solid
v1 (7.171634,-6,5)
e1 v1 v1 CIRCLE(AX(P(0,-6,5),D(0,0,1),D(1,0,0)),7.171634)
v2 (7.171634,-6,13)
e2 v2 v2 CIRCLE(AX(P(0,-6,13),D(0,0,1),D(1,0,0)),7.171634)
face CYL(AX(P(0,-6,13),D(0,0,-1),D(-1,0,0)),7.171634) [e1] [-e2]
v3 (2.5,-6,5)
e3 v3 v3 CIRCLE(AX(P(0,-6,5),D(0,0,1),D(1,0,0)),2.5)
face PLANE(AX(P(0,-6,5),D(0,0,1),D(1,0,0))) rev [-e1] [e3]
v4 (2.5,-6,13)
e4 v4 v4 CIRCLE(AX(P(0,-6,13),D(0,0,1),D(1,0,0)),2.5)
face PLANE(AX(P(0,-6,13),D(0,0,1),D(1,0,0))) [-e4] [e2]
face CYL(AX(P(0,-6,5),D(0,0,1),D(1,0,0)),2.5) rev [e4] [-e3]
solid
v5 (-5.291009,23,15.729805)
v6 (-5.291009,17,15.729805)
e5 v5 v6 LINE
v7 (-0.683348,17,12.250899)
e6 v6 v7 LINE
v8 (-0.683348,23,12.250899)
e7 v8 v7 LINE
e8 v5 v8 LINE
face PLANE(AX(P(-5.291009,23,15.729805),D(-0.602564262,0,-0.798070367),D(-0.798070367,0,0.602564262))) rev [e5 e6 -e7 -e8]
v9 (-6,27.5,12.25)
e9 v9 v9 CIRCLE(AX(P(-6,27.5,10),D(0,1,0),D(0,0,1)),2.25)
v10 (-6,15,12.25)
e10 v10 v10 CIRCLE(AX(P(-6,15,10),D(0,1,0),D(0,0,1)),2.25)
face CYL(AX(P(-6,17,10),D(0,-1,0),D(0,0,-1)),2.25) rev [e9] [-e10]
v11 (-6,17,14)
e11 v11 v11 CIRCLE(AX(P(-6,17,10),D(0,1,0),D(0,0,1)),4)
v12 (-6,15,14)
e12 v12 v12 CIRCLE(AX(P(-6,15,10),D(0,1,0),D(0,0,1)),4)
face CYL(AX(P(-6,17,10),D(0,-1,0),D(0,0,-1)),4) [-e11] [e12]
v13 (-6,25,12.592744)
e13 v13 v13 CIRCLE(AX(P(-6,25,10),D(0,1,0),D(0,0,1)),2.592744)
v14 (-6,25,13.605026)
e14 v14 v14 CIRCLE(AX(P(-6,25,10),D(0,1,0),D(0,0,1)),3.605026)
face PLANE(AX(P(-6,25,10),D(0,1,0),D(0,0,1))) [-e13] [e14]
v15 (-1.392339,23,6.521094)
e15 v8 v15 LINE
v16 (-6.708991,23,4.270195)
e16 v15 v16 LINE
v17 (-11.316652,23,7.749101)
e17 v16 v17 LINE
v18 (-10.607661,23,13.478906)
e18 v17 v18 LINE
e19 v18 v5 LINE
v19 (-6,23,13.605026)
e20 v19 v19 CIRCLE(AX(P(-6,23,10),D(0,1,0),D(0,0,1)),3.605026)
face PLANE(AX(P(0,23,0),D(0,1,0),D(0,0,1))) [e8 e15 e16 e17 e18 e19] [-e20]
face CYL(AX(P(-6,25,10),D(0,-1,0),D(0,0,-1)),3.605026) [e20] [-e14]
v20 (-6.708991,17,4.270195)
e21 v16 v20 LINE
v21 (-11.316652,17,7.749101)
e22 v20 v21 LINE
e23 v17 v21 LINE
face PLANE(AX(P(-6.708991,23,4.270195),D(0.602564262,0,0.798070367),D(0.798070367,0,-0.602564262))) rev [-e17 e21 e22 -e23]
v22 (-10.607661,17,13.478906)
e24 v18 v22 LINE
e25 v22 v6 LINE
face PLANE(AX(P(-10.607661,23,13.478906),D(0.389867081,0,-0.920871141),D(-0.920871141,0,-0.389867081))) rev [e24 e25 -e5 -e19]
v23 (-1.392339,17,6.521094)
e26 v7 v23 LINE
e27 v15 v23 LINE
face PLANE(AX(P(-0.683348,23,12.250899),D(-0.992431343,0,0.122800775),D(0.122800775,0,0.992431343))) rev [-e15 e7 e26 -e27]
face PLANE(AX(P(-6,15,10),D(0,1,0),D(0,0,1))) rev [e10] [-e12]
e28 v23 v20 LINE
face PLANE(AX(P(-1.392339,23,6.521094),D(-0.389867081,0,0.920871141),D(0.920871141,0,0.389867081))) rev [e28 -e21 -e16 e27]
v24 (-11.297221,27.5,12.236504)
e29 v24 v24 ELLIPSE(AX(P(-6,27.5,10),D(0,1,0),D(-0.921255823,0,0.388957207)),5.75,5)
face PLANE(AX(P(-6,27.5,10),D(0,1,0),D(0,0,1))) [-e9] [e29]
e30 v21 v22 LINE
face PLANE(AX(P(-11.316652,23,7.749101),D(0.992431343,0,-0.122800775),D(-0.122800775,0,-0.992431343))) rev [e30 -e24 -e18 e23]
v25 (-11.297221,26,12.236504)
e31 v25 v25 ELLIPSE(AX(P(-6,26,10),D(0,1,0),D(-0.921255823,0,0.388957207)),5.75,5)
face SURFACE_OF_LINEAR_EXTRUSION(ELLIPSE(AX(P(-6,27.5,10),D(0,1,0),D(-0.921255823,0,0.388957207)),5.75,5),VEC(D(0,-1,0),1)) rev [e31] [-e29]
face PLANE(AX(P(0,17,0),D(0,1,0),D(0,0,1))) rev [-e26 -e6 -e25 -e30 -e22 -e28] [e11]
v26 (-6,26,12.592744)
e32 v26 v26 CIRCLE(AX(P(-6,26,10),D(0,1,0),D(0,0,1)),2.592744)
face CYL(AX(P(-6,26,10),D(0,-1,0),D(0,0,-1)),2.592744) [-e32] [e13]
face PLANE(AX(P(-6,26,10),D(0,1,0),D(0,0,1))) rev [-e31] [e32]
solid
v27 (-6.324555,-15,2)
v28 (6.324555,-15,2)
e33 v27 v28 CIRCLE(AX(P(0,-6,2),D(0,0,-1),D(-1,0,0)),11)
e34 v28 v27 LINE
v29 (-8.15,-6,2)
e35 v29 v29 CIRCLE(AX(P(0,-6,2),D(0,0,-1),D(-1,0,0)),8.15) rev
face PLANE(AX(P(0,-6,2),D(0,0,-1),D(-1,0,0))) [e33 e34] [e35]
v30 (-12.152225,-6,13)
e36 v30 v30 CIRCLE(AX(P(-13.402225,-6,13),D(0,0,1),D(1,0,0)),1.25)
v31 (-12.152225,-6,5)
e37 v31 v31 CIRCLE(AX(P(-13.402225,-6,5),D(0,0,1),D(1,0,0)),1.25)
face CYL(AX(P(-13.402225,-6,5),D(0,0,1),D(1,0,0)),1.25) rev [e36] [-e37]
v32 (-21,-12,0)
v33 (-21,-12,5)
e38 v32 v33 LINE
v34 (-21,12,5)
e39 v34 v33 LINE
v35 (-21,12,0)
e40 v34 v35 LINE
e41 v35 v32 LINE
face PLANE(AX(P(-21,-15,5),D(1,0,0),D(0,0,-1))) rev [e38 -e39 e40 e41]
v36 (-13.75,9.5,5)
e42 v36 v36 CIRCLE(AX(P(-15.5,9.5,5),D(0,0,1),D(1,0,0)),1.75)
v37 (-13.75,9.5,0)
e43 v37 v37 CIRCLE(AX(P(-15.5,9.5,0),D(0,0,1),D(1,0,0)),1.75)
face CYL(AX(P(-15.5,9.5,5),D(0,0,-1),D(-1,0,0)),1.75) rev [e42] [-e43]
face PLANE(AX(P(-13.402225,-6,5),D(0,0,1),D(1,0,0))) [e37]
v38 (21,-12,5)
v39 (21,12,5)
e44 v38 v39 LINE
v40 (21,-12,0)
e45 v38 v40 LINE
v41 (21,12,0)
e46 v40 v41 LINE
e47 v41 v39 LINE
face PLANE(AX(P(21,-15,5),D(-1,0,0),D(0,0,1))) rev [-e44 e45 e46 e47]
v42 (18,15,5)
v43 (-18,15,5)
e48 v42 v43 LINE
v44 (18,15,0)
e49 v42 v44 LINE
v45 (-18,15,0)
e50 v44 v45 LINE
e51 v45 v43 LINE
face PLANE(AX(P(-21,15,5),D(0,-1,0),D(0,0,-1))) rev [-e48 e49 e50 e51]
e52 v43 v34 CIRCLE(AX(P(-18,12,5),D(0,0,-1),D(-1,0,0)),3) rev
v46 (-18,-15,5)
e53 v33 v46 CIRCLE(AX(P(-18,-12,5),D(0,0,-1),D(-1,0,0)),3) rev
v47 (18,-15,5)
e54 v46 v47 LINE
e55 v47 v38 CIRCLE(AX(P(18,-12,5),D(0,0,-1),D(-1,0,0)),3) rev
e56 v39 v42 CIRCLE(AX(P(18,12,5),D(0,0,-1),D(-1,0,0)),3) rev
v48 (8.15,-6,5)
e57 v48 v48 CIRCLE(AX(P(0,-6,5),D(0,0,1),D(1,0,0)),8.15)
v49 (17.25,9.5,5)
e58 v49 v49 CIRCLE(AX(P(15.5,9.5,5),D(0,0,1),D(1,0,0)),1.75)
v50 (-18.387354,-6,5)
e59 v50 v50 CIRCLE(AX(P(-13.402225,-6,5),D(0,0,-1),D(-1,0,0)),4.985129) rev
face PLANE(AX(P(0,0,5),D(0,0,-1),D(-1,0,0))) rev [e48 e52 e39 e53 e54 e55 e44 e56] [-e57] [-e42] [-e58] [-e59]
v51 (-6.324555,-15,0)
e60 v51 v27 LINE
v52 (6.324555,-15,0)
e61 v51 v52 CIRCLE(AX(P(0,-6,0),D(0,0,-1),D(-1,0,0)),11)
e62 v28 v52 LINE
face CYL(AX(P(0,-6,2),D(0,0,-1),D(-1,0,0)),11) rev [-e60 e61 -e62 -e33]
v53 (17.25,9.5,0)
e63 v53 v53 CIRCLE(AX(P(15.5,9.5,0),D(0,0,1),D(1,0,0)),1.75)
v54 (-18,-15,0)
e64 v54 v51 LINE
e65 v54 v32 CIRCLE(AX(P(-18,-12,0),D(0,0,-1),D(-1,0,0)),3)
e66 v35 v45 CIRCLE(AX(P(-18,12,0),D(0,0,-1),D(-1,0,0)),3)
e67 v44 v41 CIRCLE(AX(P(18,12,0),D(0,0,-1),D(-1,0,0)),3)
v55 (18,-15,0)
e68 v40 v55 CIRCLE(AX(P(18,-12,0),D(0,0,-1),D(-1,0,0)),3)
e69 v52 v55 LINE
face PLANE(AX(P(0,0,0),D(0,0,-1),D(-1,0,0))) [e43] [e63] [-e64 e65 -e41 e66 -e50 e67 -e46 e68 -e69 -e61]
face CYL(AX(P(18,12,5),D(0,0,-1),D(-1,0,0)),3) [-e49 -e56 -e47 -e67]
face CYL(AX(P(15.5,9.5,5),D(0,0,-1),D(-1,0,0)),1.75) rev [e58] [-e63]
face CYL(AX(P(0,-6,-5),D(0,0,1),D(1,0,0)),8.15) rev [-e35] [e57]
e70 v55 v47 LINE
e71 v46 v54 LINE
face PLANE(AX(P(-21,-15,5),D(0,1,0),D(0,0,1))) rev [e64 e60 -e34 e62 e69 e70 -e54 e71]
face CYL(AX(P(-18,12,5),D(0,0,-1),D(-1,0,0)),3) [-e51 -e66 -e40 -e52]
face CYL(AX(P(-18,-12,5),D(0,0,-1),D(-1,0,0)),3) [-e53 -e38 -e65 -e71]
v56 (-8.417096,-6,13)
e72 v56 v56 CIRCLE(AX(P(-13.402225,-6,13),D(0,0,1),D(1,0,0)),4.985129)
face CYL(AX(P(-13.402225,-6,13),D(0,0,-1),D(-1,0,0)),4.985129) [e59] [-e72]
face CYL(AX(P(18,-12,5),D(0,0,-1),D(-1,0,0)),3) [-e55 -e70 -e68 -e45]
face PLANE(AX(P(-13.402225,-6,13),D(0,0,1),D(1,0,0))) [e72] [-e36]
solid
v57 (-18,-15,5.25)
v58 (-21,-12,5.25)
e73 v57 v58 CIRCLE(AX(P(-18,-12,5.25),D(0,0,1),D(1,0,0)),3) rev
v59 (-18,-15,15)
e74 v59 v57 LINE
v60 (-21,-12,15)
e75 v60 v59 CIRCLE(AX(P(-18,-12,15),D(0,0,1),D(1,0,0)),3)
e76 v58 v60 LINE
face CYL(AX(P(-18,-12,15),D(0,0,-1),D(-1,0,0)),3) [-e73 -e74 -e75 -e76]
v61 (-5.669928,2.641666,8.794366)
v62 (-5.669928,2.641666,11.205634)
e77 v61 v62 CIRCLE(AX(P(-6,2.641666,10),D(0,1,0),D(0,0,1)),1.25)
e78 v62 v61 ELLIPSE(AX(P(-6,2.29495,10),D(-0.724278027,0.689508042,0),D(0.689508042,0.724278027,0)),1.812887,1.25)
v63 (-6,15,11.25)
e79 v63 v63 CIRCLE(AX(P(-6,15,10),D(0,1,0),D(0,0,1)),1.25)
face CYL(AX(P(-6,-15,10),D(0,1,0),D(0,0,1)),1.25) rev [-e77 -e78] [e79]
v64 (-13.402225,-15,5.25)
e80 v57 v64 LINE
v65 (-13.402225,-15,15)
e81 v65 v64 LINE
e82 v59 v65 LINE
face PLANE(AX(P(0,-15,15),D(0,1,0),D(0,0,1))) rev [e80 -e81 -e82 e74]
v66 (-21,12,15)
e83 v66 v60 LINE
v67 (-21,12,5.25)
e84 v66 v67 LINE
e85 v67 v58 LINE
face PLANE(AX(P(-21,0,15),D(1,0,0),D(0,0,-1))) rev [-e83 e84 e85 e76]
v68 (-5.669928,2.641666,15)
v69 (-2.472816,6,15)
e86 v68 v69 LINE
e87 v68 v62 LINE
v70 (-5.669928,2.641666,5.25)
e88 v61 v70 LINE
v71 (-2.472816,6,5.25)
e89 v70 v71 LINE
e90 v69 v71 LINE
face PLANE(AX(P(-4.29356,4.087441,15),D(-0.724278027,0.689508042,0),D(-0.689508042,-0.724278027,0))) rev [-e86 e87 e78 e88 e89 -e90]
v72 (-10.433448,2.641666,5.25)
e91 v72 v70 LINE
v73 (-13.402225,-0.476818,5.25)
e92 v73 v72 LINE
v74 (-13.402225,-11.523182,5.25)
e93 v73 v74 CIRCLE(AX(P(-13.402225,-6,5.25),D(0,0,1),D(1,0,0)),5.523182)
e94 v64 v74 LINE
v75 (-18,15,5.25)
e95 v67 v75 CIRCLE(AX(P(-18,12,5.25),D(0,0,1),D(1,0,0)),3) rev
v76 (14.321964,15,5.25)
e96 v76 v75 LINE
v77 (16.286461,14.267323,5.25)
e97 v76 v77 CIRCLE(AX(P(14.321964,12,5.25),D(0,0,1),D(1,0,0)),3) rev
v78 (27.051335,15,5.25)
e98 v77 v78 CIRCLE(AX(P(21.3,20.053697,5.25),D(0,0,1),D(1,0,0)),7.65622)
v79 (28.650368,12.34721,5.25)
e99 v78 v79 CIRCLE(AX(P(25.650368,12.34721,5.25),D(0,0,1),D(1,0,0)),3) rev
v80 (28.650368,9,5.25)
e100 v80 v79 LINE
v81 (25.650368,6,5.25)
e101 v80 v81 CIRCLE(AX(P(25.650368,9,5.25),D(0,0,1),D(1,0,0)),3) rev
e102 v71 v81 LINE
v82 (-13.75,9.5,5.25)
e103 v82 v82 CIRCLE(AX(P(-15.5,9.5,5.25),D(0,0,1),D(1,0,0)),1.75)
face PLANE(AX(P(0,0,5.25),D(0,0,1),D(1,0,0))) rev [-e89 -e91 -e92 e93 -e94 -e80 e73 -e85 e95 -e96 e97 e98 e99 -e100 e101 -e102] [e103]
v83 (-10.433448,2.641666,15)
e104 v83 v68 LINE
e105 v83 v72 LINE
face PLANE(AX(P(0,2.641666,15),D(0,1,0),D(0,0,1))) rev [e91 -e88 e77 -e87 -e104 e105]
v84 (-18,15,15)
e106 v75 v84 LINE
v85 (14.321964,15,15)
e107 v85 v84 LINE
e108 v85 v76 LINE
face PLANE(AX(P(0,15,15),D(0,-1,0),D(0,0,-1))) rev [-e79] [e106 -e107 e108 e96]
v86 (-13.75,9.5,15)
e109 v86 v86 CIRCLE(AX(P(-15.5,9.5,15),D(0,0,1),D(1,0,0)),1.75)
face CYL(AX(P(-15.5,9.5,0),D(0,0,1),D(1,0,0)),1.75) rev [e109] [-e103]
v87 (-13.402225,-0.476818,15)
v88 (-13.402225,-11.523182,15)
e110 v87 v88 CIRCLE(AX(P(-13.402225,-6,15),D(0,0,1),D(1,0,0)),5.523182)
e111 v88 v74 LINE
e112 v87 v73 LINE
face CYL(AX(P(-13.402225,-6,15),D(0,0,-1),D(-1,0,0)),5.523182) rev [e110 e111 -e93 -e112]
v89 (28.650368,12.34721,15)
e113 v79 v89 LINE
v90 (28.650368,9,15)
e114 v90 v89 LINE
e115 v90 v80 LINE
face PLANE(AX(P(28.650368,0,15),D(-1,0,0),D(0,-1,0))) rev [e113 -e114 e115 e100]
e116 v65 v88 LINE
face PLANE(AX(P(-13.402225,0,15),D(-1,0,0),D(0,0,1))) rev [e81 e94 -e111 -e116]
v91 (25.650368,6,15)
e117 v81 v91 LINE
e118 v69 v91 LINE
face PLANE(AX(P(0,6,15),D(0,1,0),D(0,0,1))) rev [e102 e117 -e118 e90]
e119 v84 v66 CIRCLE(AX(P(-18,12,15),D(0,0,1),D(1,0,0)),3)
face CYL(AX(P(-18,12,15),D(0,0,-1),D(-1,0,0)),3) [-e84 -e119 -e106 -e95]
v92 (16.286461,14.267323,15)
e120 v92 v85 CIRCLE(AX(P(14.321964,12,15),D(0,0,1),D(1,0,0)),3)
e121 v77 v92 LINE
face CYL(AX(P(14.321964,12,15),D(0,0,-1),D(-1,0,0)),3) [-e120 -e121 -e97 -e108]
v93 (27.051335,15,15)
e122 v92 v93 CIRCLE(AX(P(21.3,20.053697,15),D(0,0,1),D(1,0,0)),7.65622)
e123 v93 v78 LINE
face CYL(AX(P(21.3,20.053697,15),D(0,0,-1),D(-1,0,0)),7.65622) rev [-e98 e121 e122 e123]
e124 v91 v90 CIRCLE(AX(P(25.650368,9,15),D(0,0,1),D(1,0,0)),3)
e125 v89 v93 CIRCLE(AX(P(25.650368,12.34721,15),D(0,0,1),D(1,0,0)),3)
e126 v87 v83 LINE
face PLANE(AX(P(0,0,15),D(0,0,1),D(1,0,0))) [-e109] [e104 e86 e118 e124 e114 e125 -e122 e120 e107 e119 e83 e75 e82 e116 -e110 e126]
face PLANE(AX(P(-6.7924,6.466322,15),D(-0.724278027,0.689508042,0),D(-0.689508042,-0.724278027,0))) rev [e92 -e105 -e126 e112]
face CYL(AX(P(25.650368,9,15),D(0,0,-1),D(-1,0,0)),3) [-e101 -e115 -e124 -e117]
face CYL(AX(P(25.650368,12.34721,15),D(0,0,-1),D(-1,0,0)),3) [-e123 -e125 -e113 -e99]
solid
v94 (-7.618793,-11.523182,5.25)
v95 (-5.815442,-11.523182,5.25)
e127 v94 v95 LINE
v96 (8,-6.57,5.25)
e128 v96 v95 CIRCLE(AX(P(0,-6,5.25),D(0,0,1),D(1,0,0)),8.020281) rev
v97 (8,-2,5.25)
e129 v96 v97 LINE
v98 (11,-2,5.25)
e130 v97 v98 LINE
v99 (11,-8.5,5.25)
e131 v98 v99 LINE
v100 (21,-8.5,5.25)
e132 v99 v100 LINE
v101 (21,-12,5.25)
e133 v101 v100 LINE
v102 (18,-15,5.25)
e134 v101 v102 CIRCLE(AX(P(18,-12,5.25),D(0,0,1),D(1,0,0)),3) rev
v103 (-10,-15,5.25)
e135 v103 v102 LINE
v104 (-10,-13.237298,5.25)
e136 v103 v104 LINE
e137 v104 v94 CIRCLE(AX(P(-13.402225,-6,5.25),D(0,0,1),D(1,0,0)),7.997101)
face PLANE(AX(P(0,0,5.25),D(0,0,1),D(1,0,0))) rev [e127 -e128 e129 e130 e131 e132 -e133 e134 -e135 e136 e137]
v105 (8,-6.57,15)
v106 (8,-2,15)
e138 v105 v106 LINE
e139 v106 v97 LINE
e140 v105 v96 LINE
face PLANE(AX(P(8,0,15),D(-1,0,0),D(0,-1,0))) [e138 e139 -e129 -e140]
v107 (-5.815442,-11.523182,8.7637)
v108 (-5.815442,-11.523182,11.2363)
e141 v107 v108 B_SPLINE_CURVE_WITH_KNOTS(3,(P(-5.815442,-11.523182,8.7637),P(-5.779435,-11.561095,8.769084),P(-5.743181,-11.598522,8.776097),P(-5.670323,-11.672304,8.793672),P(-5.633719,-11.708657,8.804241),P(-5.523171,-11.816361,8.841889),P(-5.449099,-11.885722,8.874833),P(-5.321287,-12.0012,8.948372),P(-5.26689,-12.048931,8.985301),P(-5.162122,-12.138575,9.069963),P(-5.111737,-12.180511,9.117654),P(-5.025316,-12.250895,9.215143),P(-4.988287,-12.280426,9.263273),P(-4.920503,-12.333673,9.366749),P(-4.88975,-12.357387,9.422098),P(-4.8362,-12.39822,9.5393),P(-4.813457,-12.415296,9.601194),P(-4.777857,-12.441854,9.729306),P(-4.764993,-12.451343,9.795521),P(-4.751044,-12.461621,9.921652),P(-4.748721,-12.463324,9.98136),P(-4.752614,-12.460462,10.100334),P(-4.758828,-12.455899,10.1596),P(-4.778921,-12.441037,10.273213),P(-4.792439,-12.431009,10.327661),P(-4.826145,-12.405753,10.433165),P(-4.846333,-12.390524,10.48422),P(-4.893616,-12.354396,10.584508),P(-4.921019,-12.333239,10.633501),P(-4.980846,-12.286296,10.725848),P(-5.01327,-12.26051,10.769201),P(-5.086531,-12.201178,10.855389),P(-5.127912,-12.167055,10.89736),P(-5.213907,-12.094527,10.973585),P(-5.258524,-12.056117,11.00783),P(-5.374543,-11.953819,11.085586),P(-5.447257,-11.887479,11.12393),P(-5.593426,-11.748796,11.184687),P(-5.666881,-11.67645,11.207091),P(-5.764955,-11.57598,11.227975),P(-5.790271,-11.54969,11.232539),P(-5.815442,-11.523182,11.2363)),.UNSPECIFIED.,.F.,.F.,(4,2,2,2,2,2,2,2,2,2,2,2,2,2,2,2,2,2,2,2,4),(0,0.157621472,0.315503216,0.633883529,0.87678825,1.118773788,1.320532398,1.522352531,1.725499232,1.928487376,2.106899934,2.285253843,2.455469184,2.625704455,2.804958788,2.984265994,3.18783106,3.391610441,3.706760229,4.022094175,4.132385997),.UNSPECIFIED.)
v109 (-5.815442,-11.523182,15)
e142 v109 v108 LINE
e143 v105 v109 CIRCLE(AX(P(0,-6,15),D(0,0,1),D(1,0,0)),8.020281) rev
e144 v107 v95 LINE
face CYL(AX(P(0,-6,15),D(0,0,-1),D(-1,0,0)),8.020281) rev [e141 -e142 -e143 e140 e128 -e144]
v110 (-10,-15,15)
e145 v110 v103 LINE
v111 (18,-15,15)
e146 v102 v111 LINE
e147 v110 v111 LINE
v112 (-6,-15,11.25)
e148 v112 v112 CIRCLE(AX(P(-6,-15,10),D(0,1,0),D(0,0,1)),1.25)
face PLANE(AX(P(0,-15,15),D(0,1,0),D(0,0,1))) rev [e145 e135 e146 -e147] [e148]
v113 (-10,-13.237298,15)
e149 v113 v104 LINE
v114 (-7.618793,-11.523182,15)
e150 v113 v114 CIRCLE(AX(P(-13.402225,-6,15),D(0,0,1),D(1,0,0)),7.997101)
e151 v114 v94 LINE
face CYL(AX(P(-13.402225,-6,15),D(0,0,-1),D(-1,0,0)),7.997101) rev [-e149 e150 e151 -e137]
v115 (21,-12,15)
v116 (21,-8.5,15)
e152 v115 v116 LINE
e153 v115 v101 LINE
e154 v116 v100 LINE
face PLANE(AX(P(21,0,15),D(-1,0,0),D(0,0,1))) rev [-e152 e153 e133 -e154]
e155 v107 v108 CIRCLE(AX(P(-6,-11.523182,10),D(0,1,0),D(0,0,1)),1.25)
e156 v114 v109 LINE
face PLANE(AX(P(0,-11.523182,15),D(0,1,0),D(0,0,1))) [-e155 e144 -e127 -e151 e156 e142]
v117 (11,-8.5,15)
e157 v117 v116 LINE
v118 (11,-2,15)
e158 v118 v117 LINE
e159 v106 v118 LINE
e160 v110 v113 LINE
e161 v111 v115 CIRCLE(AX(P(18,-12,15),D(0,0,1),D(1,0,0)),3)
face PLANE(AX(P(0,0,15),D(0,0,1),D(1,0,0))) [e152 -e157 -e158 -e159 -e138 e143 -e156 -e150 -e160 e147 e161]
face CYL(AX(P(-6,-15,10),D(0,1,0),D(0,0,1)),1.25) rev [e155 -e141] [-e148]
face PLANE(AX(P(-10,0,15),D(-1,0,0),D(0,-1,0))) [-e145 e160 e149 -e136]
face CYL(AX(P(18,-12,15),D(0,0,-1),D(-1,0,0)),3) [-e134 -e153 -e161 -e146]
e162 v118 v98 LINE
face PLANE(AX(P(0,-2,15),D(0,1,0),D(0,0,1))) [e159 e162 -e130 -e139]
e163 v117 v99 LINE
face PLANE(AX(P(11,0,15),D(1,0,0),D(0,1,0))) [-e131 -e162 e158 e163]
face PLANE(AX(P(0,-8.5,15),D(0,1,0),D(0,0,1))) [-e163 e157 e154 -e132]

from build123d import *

# Parameters (mm, degrees)
SKETCH1_W           = 42
SKETCH1_H           = 30
BOSS_EXTRUDE1_DEPTH = 5
BOSS_EXTRUDE2_START = 0.25
BOSS_EXTRUDE2_DEPTH = 9.75
FILLET1_R           = 3
SKETCH6_R           = 4
SKETCH6_R_2         = 2.25
BOSS_EXTRUDE3_DEPTH = 2
FILLET2_R           = 3
FILLET3_R           = 3
FILLET4_R           = 3
BOSS_EXTRUDE5_DEPTH = 6
SKETCH14_R          = 3.605025609
BOSS_EXTRUDE6_DEPTH = 2
SKETCH15_R          = 2.592744477
BOSS_EXTRUDE7_DEPTH = 1
SKETCH16_RX         = 5.75
SKETCH16_RY         = 5
BOSS_EXTRUDE8_DEPTH = 1.5
SKETCH8_R           = 1.75
CUT_EXTRUDE10_DEPTH = 5
SKETCH5_R           = 8.15
CUT_EXTRUDE2_DEPTH  = 10
SKETCH10_R          = 11
CUT_EXTRUDE11_DEPTH = 2
SKETCH19_R          = 2.25
CUT_EXTRUDE14_DEPTH = 11
SKETCH17_R          = 1.75
CUT_EXTRUDE12_DEPTH = 43.451073105
SKETCH9_R           = 4.985129207
SKETCH9_R_2         = 7.17163429
BOSS_EXTRUDE9_DEPTH = 8
SKETCH21_R          = 2.5
SKETCH21_R_2        = 1.25
CUT_EXTRUDE17_DEPTH = 8
SKETCH20_R          = 1.25
CUT_EXTRUDE16_DEPTH = 30


with BuildPart() as part:
    # Sketch1 → Boss-Extrude1 (new body)
    with BuildSketch(Plane.XY):
        Rectangle(SKETCH1_W, SKETCH1_H)
    extrude(amount=BOSS_EXTRUDE1_DEPTH)

    # Fillet1
    fillet1_edges = [part.edges().sort_by_distance(p)[0] for p in [
        (21, -15, 2.5),
        (-21, -15, 2.5),
        (-21, 15, 2.5),
        (21, 15, 2.5),
    ]]
    fillet(fillet1_edges, radius=FILLET1_R)

    # Sketch8 → Cut-Extrude10 (cut)
    with BuildSketch(Plane.XY):
        with Locations((15.5, 9.5)):
            Circle(SKETCH8_R)
        with Locations((-15.5, 9.5)):
            Circle(SKETCH8_R)
    extrude(amount=CUT_EXTRUDE10_DEPTH, mode=Mode.SUBTRACT)

    # Sketch5 → Cut-Extrude2 (cut)
    with BuildSketch(Plane.XY.offset(5)):
        with Locations((0, -6)):
            Circle(SKETCH5_R)
    extrude(amount=-CUT_EXTRUDE2_DEPTH, mode=Mode.SUBTRACT)

    # Sketch10 → Cut-Extrude11 (cut)
    with BuildSketch(Plane(origin=(0, 0, 0), x_dir=(-1, 0, 0), z_dir=(0, 0, -1))):
        with Locations((0, -6)):
            Circle(SKETCH10_R)
    extrude(amount=-CUT_EXTRUDE11_DEPTH, mode=Mode.SUBTRACT)

    # Sketch9 → Boss-Extrude9 (add)
    with BuildSketch(Plane.XY.offset(5)):
        with Locations(Location((-13.402224813, -6, 0), (0, 0, 180))):
            Circle(SKETCH9_R)
        with Locations((0, -6)):
            Circle(SKETCH9_R_2)
    extrude(amount=BOSS_EXTRUDE9_DEPTH)


with BuildPart() as body_2:
    # Sketch2 → Boss-Extrude2 (new body)
    with BuildSketch(Plane.XY.offset(5).offset(BOSS_EXTRUDE2_START)):
        with BuildLine():
            Line((-2.472815877, 6), (21, 6))
            Line((21, 6), (21, 12.403357084))
            ThreePointArc((21, 12.403357084), (18.007538755, 13.141577193), (15.548665456, 15))
            Line((15.548665456, 15), (-21, 15))
            Line((-21, 15), (-21, -15))
            Line((-21, -15), (-13.402224813, -15))
            Line((-13.402224813, -15), (-13.402224813, -11.523181725))
            ThreePointArc((-13.402224813, -11.523181725), (-18.925406538, -6), (-13.402224813, -0.476818275))
            Line((-13.402224813, -0.476818275), (-10.433447695, 2.64166607))
            Line((-10.433447695, 2.64166607), (-5.669928262, 2.64166607))
            Line((-5.669928262, 2.64166607), (-2.472815877, 6))
        make_face()
        with BuildLine():
            Line((8, -2), (8, -6.57))
            ThreePointArc((8, -6.57), (2.706764841, -13.549723445), (-5.815441826, -11.523181725))
            Line((-5.815441826, -11.523181725), (-7.618792835, -11.523181725))
            ThreePointArc((-7.618792835, -11.523181725), (-8.730113763, -12.490377504), (-10, -13.2372984))
            Line((-10, -13.2372984), (-10, -15))
            Line((-10, -15), (21, -15))
            Line((21, -15), (21, -8.5))
            Line((21, -8.5), (11, -8.5))
            Line((11, -8.5), (11, -2))
            Line((11, -2), (8, -2))
        make_face()
        with BuildLine():
            Line((21, 12.403357084), (21, 6))
            Line((21, 6), (28.65036837, 6))
            Line((28.65036837, 6), (28.65036837, 15))
            Line((28.65036837, 15), (27.051334544, 15))
            ThreePointArc((27.051334544, 15), (24.31908938, 13.017874339), (21, 12.403357084))
        make_face()
    extrude(amount=BOSS_EXTRUDE2_DEPTH)

    # Fillet2
    fillet2_edges = [body_2.edges().sort_by_distance(p)[0] for p in [
        (-21, 15, 10.125),
    ]]
    fillet(fillet2_edges, radius=FILLET2_R)

    # Fillet3
    fillet3_edges = [body_2.edges().sort_by_distance(p)[0] for p in [
        (21, -15, 10.125),
    ]]
    fillet(fillet3_edges, radius=FILLET3_R)

    # Fillet4
    # the kernel refuses this fillet: 3 mm, written as the material it takes off along each edge
    with BuildSketch(Plane(origin=(28.65036837, 15, -1.381974526), x_dir=(-1, 0, 0), z_dir=(0, 0, 1))) as fillet4_piece_1:
        with BuildLine():
            CenterArc((3, 2.65278981), FILLET4_R, 180, 62.160994983)
            Line((0, 2.65278981), (-0.06, 2.65278981))
            Line((-0.06, 2.65278981), (-0.06, 0))
            Line((-0.06, 0), (0, -0.06))
            ThreePointArc((0, -0.06), (0.799516913, -0.06), (1.571014502, -0.053055796))
            Line((1.571014502, -0.053055796), (1.599033825, 0))
        make_face()
    extrude(amount=23.013949052, mode=Mode.SUBTRACT)
    with BuildSketch(Plane(origin=(28.65036837, 6, -2.25), x_dir=(0, 1, 0), z_dir=(0, 0, 1))) as fillet4_piece_2:
        with BuildLine():
            CenterArc((FILLET4_R, FILLET4_R), FILLET4_R, 180, 90)
            Line((0, FILLET4_R), (-FILLET4_R * 0.02, FILLET4_R))
            Line((-FILLET4_R * 0.02, FILLET4_R), (-FILLET4_R * 0.02, -FILLET4_R * 0.02))
            Line((-FILLET4_R * 0.02, -FILLET4_R * 0.02), (FILLET4_R, -FILLET4_R * 0.02))
            Line((FILLET4_R, -FILLET4_R * 0.02), (FILLET4_R, 0))
        make_face()
    extrude(amount=24.75, mode=Mode.SUBTRACT)
    with BuildSketch(Plane(origin=(-21, -15, -2.25), x_dir=(0, 1, 0), z_dir=(0, 0, 1))) as fillet4_piece_3:
        with BuildLine():
            CenterArc((FILLET4_R, -FILLET4_R), FILLET4_R, 90, 90)
            Line((0, -FILLET4_R), (-FILLET4_R * 0.02, -FILLET4_R))
            Line((-FILLET4_R * 0.02, -FILLET4_R), (-FILLET4_R * 0.02, FILLET4_R * 0.02))
            Line((-FILLET4_R * 0.02, FILLET4_R * 0.02), (FILLET4_R, FILLET4_R * 0.02))
            Line((FILLET4_R, FILLET4_R * 0.02), (FILLET4_R, 0))
        make_face()
    extrude(amount=24.75, mode=Mode.SUBTRACT)
    with BuildSketch(Plane(origin=(15.548665456, 15, 2.183246521), x_dir=(-1, 0, 0), z_dir=(0, 0, 1))) as fillet4_piece_4:
        with BuildLine():
            CenterArc((1.226701392, 3), FILLET4_R, 229.093072907, 40.906927093)
            Line((-0.737795184, 0.732677085), (-0.777085116, 0.687330626))
            ThreePointArc((-0.777085116, 0.687330626), (-0.398723642, 0.336304143), (-0.045071859, -0.03960464))
            Line((-0.045071859, -0.03960464), (0, -0.06))
            Line((0, -0.06), (1.226701392, -0.06))
            Line((1.226701392, -0.06), (1.226701392, 0))
        make_face()
    extrude(amount=15.883506959, mode=Mode.SUBTRACT)

    # Sketch17 → Cut-Extrude12 (cut, through all)
    with BuildSketch(Plane.XY.offset(15)):
        with Locations((-15.5, 9.5)):
            Circle(SKETCH17_R)
    extrude(amount=-CUT_EXTRUDE12_DEPTH, mode=Mode.SUBTRACT)

    # Sketch20 → Cut-Extrude16 (cut)
    with BuildSketch(Plane(origin=(0, 15, 0), x_dir=(1, 0, 0), z_dir=(0, 1, 0))):
        with Locations(Location((-6, -10, 0), (0, 0, 270))):
            Circle(SKETCH20_R)
    extrude(amount=-CUT_EXTRUDE16_DEPTH, mode=Mode.SUBTRACT)


with BuildPart() as body_3:
    # Sketch6 → Boss-Extrude3 (new body)
    with BuildSketch(Plane(origin=(0, 15, 0), x_dir=(1, 0, 0), z_dir=(0, 1, 0))):
        with Locations(Location((-6, -10, 0), (0, 0, 270))):
            Circle(SKETCH6_R)
        with Locations(Location((-6, -10, 0), (0, 0, 270))):
            Circle(SKETCH6_R_2, mode=Mode.SUBTRACT)
    extrude(amount=BOSS_EXTRUDE3_DEPTH)

    # Sketch13 → Boss-Extrude5 (add)
    with BuildSketch(Plane(origin=(0, 17, 0), x_dir=(1, 0, 0), z_dir=(0, 1, 0))):
        Polygon((-0.683347986, -12.250898641), (-1.392338588, -6.521093613), (-6.708990602, -4.270194972), (-11.316652014, -7.749101359), (-10.607661412, -13.478906387), (-5.291009398, -15.729805028), align=None)
    extrude(amount=BOSS_EXTRUDE5_DEPTH)

    # Sketch14 → Boss-Extrude6 (add)
    with BuildSketch(Plane(origin=(0, 23, 0), x_dir=(1, 0, 0), z_dir=(0, 1, 0))):
        with Locations(Location((-6, -10, 0), (0, 0, 270))):
            Circle(SKETCH14_R)
    extrude(amount=BOSS_EXTRUDE6_DEPTH)

    # Sketch15 → Boss-Extrude7 (add)
    with BuildSketch(Plane(origin=(0, 25, 0), x_dir=(1, 0, 0), z_dir=(0, 1, 0))):
        with Locations(Location((-6, -10, 0), (0, 0, 270))):
            Circle(SKETCH15_R)
    extrude(amount=BOSS_EXTRUDE7_DEPTH)

    # Sketch16 → Boss-Extrude8 (add)
    with BuildSketch(Plane(origin=(0, 26, 0), x_dir=(1, 0, 0), z_dir=(0, 1, 0))):
        with Locations(Location((-6, -10), (0, 0, -157.110370681))):
            Ellipse(SKETCH16_RX, SKETCH16_RY)
    extrude(amount=BOSS_EXTRUDE8_DEPTH)

    # Sketch19 → Cut-Extrude14 (cut)
    with BuildSketch(Plane(origin=(0, 27.5, 0), x_dir=(1, 0, 0), z_dir=(0, 1, 0))):
        with Locations(Location((-6, -10, 0), (0, 0, 270))):
            Circle(SKETCH19_R)
    extrude(amount=-CUT_EXTRUDE14_DEPTH, mode=Mode.SUBTRACT)


with BuildPart() as boss_extrude9_piece_1:
    # of the separate pieces the step leaves, piece 1, a body of its own (boss_extrude9_pieces)
    add(part.part.solids().sort_by_distance((-18, -15, 0))[0])


with BuildPart() as boss_extrude9_piece_2:
    # of the separate pieces the step leaves, piece 2, a body of its own (boss_extrude9_pieces)
    add(part.part.solids().sort_by_distance((7.17163429, -6, 5))[0])


with BuildPart() as cut_extrude17_tool:
    # Sketch21 → Cut-Extrude17 (new body)
    with BuildSketch(Plane.XY.offset(13)):
        with Locations((0, -6)):
            Circle(SKETCH21_R)
        with Locations((-13.402224813, -6)):
            Circle(SKETCH21_R_2)
    extrude(amount=-CUT_EXTRUDE17_DEPTH)


with BuildPart() as boss_extrude9_piece_1_1:
    add(boss_extrude9_piece_1.part)

    # Cut-Extrude17: cut by cut_extrude17_tool
    add(cut_extrude17_tool.part, mode=Mode.SUBTRACT)


with BuildPart() as boss_extrude9_piece_2_1:
    add(boss_extrude9_piece_2.part)

    # Cut-Extrude17: cut by cut_extrude17_tool
    add(cut_extrude17_tool.part, mode=Mode.SUBTRACT)


solid = Compound([body_2.part, body_3.part, boss_extrude9_piece_1_1.part, boss_extrude9_piece_2_1.part])
